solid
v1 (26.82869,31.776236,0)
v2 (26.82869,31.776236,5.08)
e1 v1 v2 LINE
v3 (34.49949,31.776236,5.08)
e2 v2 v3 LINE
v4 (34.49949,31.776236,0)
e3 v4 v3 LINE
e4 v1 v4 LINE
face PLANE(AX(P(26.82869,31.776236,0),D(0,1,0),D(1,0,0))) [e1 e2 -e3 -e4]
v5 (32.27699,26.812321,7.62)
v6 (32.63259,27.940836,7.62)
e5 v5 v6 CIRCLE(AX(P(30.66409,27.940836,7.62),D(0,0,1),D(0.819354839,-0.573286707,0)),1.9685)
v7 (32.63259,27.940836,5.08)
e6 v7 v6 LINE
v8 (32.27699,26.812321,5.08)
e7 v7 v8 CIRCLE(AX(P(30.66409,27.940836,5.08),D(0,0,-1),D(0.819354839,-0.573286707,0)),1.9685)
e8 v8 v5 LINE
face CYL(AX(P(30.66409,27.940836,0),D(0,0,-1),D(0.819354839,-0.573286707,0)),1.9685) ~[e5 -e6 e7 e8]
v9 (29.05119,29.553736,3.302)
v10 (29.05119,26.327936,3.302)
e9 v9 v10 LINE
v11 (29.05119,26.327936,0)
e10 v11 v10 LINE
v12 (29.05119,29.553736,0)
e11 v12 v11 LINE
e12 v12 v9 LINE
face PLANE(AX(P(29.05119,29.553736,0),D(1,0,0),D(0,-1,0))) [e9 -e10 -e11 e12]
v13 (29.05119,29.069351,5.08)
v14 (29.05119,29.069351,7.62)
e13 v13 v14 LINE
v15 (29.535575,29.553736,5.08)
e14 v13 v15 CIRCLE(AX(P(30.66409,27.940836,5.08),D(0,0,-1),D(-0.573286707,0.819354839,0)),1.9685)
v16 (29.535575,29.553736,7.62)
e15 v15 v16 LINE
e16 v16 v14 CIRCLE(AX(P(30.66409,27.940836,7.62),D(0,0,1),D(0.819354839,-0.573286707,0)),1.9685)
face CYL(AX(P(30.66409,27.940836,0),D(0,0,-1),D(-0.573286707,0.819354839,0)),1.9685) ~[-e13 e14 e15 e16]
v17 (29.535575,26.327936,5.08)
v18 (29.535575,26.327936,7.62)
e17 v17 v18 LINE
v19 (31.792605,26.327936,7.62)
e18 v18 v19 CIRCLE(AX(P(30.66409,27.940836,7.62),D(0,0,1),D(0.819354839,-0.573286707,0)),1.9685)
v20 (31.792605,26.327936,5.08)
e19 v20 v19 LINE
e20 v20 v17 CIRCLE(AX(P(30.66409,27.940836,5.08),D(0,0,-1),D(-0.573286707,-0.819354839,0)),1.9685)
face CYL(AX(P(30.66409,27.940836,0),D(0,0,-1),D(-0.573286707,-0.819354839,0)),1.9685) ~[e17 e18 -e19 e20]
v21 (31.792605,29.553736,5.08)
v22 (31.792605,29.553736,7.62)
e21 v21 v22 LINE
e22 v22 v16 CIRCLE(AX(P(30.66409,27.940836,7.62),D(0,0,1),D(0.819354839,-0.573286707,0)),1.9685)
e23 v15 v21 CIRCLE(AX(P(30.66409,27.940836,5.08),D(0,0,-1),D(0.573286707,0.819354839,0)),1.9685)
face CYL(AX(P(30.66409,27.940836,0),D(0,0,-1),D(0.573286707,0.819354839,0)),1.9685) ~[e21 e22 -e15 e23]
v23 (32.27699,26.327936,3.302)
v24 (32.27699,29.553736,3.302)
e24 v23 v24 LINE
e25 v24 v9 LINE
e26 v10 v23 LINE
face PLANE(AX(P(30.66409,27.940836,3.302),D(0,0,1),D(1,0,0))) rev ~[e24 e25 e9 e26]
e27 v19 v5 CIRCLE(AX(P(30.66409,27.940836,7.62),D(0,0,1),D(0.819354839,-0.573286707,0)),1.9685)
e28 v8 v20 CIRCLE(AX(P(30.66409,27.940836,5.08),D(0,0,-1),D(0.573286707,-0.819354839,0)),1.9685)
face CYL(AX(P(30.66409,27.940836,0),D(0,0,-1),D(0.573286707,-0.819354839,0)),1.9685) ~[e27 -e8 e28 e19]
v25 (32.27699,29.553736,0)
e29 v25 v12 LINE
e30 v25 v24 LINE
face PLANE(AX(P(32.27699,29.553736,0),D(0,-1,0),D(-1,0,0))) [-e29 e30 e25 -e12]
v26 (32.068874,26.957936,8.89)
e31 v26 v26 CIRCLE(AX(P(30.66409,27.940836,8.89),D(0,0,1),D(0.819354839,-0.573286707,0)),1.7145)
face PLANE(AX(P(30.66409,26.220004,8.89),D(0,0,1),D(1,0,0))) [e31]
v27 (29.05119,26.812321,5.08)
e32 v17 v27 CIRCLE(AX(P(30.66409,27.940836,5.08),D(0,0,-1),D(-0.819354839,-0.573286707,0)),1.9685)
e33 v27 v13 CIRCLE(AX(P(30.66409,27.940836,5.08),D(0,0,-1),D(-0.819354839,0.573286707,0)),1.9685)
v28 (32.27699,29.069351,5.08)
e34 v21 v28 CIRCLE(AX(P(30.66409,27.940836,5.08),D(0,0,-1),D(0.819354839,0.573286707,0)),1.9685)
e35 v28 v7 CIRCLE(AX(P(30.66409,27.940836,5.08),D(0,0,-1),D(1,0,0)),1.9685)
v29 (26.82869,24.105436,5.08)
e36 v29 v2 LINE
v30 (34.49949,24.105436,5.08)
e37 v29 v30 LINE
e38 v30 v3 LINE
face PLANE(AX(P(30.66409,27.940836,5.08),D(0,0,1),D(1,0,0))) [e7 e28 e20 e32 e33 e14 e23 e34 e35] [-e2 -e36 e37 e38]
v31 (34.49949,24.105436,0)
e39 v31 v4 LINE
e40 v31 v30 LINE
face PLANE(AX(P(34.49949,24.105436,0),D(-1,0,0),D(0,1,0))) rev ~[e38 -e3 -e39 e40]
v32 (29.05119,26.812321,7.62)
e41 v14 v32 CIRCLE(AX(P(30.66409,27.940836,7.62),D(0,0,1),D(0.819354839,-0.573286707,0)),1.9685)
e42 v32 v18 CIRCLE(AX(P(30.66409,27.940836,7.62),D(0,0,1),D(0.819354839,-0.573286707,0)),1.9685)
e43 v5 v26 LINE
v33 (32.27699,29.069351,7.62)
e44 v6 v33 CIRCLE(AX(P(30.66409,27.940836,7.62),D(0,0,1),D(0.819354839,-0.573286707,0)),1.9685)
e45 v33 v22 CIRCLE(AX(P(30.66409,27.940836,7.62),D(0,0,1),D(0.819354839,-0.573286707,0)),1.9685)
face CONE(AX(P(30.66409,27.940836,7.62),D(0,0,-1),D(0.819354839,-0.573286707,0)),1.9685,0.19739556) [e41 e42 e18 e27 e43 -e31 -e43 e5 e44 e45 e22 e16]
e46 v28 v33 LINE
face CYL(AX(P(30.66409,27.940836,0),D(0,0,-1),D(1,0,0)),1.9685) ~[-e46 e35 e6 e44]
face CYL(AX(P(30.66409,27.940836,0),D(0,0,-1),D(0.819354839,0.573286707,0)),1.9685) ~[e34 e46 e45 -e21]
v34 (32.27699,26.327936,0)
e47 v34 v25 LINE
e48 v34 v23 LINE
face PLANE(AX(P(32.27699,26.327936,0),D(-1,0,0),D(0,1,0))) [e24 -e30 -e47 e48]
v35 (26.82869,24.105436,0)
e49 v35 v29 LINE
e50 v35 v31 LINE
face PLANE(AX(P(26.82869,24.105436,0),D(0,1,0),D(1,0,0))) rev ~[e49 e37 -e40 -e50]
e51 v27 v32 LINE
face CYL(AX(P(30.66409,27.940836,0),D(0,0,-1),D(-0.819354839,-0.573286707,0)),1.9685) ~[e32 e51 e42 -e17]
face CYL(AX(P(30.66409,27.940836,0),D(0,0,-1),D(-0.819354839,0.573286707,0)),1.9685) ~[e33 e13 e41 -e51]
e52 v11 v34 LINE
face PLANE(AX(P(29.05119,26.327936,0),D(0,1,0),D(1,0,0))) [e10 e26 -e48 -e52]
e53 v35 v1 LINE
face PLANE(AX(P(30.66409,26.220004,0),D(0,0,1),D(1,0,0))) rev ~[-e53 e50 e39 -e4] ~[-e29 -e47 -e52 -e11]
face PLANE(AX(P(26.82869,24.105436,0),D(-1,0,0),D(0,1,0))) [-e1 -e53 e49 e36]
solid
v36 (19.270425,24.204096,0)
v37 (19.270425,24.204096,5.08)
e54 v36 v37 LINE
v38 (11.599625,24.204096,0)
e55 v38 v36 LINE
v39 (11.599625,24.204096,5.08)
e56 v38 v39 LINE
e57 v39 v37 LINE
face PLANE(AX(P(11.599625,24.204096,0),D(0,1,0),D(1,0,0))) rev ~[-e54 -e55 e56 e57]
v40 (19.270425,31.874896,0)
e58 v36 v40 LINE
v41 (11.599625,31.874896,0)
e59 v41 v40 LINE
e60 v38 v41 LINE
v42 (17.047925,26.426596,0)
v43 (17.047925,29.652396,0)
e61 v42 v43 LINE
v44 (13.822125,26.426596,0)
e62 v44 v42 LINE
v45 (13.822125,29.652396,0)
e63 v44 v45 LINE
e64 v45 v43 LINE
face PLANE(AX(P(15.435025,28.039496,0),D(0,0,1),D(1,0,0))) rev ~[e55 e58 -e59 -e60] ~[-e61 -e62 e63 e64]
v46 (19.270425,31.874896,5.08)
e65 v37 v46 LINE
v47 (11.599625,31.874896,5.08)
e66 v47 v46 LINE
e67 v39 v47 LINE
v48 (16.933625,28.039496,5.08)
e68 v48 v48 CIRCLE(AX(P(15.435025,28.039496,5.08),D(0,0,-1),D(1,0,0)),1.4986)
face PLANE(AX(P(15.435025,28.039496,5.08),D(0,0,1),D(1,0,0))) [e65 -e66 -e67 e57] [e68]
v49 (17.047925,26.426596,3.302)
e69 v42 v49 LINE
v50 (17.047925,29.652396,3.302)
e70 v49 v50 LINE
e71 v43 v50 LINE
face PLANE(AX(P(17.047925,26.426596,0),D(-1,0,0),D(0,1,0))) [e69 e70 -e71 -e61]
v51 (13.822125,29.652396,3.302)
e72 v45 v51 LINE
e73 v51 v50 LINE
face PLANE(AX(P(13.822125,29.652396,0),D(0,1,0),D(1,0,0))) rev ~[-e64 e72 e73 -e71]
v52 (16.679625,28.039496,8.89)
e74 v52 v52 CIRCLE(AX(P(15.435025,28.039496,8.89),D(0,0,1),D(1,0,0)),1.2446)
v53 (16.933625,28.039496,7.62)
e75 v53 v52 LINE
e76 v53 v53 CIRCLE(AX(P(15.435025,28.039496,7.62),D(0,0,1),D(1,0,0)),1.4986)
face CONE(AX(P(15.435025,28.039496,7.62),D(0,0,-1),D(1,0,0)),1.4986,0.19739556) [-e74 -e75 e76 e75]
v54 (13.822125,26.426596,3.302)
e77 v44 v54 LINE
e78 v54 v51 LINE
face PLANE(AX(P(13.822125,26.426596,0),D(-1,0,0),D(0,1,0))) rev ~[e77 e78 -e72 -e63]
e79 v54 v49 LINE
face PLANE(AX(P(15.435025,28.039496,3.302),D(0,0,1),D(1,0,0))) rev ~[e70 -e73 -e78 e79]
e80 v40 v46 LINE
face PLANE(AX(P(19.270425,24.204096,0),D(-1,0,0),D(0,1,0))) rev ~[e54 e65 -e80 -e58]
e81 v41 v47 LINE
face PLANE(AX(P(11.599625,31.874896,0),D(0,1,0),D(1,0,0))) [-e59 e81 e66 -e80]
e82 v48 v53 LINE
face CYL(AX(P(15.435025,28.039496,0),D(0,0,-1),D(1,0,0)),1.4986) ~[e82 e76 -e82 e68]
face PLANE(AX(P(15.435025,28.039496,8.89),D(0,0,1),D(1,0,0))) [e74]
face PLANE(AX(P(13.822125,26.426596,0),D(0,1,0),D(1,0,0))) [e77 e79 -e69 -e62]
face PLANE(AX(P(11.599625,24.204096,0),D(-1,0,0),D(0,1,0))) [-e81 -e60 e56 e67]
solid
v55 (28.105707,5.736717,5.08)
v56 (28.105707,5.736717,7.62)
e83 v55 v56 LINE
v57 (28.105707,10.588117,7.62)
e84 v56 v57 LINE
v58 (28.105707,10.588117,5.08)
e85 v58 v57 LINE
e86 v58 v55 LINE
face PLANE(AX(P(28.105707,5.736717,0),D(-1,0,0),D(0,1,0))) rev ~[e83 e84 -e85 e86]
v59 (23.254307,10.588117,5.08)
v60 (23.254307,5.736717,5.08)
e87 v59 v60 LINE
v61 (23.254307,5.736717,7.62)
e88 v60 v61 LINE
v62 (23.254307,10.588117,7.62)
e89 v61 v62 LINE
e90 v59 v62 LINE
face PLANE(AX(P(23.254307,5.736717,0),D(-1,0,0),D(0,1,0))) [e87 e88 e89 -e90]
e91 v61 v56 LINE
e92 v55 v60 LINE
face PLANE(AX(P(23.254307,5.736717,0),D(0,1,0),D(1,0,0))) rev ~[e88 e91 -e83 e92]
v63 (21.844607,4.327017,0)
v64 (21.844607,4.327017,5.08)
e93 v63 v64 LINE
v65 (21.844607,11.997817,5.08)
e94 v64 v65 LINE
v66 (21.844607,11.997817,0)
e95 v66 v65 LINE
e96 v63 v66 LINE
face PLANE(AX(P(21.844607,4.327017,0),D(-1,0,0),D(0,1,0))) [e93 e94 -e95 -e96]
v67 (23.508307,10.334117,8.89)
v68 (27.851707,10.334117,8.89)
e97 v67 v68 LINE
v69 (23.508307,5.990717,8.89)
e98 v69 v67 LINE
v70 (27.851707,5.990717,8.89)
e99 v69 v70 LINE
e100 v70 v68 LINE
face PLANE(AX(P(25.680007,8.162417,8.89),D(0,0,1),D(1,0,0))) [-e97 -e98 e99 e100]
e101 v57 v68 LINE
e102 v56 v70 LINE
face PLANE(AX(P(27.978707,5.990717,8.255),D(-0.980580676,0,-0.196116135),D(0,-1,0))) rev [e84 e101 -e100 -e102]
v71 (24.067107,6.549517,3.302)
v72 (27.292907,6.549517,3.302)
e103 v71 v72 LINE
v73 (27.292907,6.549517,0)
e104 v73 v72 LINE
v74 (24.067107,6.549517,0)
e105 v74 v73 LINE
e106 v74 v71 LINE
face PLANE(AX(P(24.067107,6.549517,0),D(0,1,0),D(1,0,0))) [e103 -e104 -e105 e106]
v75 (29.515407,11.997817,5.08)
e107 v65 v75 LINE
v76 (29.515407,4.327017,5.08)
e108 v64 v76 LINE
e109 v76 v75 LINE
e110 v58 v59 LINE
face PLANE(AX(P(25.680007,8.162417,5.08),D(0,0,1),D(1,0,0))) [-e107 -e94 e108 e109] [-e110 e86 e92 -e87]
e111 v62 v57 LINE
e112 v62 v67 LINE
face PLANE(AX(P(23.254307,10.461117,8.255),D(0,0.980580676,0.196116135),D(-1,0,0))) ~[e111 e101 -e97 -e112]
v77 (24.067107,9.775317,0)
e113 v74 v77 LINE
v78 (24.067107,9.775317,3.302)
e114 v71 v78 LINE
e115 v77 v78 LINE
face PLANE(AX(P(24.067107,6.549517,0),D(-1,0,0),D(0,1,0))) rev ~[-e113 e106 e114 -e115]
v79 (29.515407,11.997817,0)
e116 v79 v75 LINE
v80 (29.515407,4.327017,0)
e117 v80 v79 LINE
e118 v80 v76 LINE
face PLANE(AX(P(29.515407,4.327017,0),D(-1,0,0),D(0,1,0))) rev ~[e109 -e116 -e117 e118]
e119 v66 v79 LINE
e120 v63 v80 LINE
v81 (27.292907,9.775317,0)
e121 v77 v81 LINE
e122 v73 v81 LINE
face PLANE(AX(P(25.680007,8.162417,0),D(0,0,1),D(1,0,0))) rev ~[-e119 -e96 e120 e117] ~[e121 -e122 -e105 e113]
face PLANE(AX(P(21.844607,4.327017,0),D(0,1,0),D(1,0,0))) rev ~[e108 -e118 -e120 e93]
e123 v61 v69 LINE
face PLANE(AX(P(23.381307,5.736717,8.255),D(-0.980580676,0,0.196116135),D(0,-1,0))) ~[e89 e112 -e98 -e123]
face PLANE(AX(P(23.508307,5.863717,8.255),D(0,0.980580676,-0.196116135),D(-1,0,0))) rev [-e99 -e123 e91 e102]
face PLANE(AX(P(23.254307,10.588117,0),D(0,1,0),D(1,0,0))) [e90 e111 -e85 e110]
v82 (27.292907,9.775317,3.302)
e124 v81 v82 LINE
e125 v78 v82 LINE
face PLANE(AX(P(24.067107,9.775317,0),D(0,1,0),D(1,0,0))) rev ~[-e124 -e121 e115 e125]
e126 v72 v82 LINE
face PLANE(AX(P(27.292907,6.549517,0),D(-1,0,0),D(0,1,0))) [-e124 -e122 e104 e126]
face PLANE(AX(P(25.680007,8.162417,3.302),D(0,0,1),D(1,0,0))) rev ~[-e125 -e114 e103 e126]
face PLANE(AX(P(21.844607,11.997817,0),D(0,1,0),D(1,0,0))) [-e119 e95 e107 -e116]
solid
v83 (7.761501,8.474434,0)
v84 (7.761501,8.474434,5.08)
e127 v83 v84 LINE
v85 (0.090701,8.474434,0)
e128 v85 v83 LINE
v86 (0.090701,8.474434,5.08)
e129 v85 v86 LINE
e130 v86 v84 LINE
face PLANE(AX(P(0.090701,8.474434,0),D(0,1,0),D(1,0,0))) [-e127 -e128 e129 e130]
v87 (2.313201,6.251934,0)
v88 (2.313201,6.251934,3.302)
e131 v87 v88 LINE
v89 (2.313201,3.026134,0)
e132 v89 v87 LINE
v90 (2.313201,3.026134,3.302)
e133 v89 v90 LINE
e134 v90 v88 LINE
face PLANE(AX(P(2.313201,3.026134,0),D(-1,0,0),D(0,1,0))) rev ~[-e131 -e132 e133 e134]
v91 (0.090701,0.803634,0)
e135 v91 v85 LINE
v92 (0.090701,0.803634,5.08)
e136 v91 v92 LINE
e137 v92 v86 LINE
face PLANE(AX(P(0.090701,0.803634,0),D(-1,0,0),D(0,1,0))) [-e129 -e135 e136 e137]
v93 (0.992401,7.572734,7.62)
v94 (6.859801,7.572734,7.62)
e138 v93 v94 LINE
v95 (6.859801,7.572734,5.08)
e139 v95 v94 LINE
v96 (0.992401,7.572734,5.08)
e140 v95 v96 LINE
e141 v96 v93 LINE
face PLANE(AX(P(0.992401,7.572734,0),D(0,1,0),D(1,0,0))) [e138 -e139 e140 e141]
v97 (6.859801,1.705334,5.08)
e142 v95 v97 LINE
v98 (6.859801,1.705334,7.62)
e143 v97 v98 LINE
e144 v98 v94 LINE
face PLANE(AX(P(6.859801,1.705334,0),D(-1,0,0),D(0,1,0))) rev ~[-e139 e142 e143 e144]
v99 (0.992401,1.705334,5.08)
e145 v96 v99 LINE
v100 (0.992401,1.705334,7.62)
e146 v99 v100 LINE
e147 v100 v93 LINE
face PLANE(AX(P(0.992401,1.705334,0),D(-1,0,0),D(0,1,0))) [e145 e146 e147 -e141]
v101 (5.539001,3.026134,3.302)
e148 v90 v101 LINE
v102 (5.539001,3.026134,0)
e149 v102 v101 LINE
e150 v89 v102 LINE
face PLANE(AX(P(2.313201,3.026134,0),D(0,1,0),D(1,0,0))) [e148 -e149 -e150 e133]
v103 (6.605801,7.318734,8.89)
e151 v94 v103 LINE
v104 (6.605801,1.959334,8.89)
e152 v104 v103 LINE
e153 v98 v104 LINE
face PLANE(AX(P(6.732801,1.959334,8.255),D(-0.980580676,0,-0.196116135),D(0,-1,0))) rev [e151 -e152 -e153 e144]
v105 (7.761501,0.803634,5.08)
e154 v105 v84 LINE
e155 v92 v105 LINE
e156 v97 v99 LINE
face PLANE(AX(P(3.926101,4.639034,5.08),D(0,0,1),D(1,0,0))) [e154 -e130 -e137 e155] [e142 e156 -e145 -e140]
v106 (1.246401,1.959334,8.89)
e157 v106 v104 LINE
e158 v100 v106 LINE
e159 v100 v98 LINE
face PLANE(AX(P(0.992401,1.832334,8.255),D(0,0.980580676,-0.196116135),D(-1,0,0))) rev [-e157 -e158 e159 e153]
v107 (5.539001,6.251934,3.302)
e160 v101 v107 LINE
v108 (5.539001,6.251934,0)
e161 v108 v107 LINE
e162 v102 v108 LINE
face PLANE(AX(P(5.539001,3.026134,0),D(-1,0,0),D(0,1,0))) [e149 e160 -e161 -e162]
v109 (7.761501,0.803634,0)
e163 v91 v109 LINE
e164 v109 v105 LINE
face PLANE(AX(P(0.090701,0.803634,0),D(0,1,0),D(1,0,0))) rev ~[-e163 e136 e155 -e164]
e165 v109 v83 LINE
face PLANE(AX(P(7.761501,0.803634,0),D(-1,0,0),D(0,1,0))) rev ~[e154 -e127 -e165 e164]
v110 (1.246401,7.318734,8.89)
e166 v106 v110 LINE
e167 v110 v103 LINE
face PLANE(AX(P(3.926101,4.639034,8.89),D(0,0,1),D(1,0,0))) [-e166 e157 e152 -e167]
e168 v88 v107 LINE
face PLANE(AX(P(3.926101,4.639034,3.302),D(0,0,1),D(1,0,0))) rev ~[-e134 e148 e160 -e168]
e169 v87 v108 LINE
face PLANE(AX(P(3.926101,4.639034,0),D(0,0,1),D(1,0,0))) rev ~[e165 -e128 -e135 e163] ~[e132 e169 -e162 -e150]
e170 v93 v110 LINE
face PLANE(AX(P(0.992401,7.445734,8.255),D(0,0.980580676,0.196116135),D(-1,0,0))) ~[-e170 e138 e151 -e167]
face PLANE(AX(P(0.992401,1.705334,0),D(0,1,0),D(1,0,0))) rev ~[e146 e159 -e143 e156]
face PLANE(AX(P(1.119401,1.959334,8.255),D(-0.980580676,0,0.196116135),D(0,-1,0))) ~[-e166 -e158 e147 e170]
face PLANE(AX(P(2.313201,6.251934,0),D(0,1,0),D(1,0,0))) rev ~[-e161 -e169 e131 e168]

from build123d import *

# Parameters (mm, degrees)
F0_W          = 7.6708
F0_H          = 7.6708
F0_W_2        = 5.8674
F0_H_2        = 5.8674
F0_W_3        = 3.2258
F0_H_3        = 3.2258
F1_DEPTH      = 5.08
F0_R          = 1.4986
F0_W_4        = 4.8514
F0_H_4        = 4.8514
F2_DEPTH      = 8.89
F3_DEPTH      = 8.89
F4_DEPTH      = 8.89
F5_DEPTH      = 8.89
F6_C1_SIZE2   = 0.254
F6_C1_SIZE    = 1.27
F6_C2_SIZE2   = 0.254
F6_C2_SIZE    = 1.27
F6_C3_SIZE2   = 0.254
F6_C3_SIZE    = 1.27
F6_C4_SIZE2   = 0.254
F6_C4_SIZE    = 1.27
F6_4_C1_SIZE2 = 0.254
F6_4_C1_SIZE  = 1.27
F6_4_C2_SIZE2 = 0.254
F6_4_C2_SIZE  = 1.27
F6_4_C3_SIZE2 = 0.254
F6_4_C3_SIZE  = 1.27
F6_4_C4_SIZE2 = 0.254
F6_4_C4_SIZE  = 1.27
F7_DEPTH      = 3.302
F8_DEPTH      = 3.302
F9_DEPTH      = 3.302
F10_DEPTH     = 3.302


# Not quite as in the source:
# - a fillet or chamfer that OpenCascade refuses, or shapes differently, is made with other operations: its cross-section is extruded or revolved along the edge and cut away or added


with BuildPart() as f1:
    # F0 (on Top) → F1 (new body)
    with BuildSketch(Plane.XY):
        with Locations((3.9261005717, 4.6390335905)):
            Rectangle(F0_W, F0_H)
        with Locations((3.9261005717, 4.6390335905)):
            Rectangle(F0_W_2, F0_H_2, mode=Mode.SUBTRACT)
        with Locations((3.9261005717, 4.6390335905)):
            Rectangle(F0_W_2, F0_H_2)
        with Locations((3.9261005717, 4.6390335905)):
            Rectangle(F0_W_3, F0_H_3, mode=Mode.SUBTRACT)
        with Locations((3.9261005717, 4.6390335905)):
            Rectangle(F0_W_3, F0_H_3)
    extrude(amount=F1_DEPTH)

    # F0 (on Top) → F5 (join)
    with BuildSketch(Plane.XY):
        with Locations((3.9261005717, 4.6390335905)):
            Rectangle(F0_W_2, F0_H_2)
        with Locations((3.9261005717, 4.6390335905)):
            Rectangle(F0_W_3, F0_H_3, mode=Mode.SUBTRACT)
        with Locations((3.9261005717, 4.6390335905)):
            Rectangle(F0_W_3, F0_H_3)
    extrude(amount=F5_DEPTH)

    # F6: chamfer of 0.254 x 1.27 on 4 edges, made by hand

    # F6_c1
    f6_c1_edges = [f1.edges().sort_by_distance(p)[0] for p in [
        (3.9261005717, 1.7053335905, 8.89),
    ]]
    f6_c1_side = f1.faces().sort_by_distance((3.9261005717, 1.7053335905, 8.88492))[0]
    chamfer(f6_c1_edges, length=F6_C1_SIZE, length2=F6_C1_SIZE2, reference=f6_c1_side)

    # F6_c2
    f6_c2_edges = [f1.edges().sort_by_distance(p)[0] for p in [
        (6.8598005717, 4.7660335905, 8.89),
    ]]
    f6_c2_side = f1.faces().sort_by_distance((6.8598005717, 4.7660335905, 8.88492))[0]
    chamfer(f6_c2_edges, length=F6_C2_SIZE, length2=F6_C2_SIZE2, reference=f6_c2_side)

    # F6_c3
    f6_c3_edges = [f1.edges().sort_by_distance(p)[0] for p in [
        (3.7991005717, 7.5727335905, 8.89),
    ]]
    f6_c3_side = f1.faces().sort_by_distance((3.7991005717, 7.5727335905, 8.88492))[0]
    chamfer(f6_c3_edges, length=F6_C3_SIZE, length2=F6_C3_SIZE2, reference=f6_c3_side)

    # F6_c4
    f6_c4_edges = [f1.edges().sort_by_distance(p)[0] for p in [
        (0.9924005717, 4.6390335905, 8.89),
    ]]
    f6_c4_side = f1.faces().sort_by_distance((0.9924005717, 4.6390335905, 8.88492))[0]
    chamfer(f6_c4_edges, length=F6_C4_SIZE, length2=F6_C4_SIZE2, reference=f6_c4_side)

    # F0 (on Top) → F10 (cut)
    with BuildSketch(Plane.XY):
        with Locations((3.9261005717, 4.6390335905)):
            Rectangle(F0_W_3, F0_H_3)
    extrude(amount=F10_DEPTH, mode=Mode.SUBTRACT)


with BuildPart() as f1b:
    # F0 (on Top) → F1, piece 2 (new body)
    with BuildSketch(Plane.XY):
        with Locations((30.6640900671, 27.9408358037)):
            Rectangle(F0_W, F0_H)
        with BuildLine():
            Line((29.0511900671, 29.0693506862), (29.0511900671, 29.5537358037))
            Line((29.0511900671, 29.5537358037), (29.5355751847, 29.5537358037))
            ThreePointArc((29.5355751847, 29.5537358037), (30.6640900671, 29.9093358037), (31.7926049496, 29.5537358037))
            Line((31.7926049496, 29.5537358037), (32.2769900671, 29.5537358037))
            Line((32.2769900671, 29.5537358037), (32.2769900671, 29.0693506862))
            ThreePointArc((32.2769900671, 29.0693506862), (32.5415865252, 28.5324431904), (32.6325900671, 27.9408358037))
            ThreePointArc((32.6325900671, 27.9408358037), (32.5415865252, 27.349228417), (32.2769900671, 26.8123209213))
            Line((32.2769900671, 26.8123209213), (32.2769900671, 26.3279358037))
            Line((32.2769900671, 26.3279358037), (31.7926049496, 26.3279358037))
            ThreePointArc((31.7926049496, 26.3279358037), (30.6640900671, 25.9723358037), (29.5355751847, 26.3279358037))
            Line((29.5355751847, 26.3279358037), (29.0511900671, 26.3279358037))
            Line((29.0511900671, 26.3279358037), (29.0511900671, 26.8123209213))
            ThreePointArc((29.0511900671, 26.8123209213), (28.6955900671, 27.9408358037), (29.0511900671, 29.0693506862))
        make_face(mode=Mode.SUBTRACT)
        with BuildLine():
            Line((31.7926049496, 29.5537358037), (29.5355751847, 29.5537358037))
            ThreePointArc((29.5355751847, 29.5537358037), (29.2721503684, 29.3327755025), (29.0511900671, 29.0693506862))
            Line((29.0511900671, 29.0693506862), (29.0511900671, 26.8123209213))
            ThreePointArc((29.0511900671, 26.8123209213), (29.2721503684, 26.548896105), (29.5355751847, 26.3279358037))
            Line((29.5355751847, 26.3279358037), (31.7926049496, 26.3279358037))
            ThreePointArc((31.7926049496, 26.3279358037), (32.0560297659, 26.548896105), (32.2769900671, 26.8123209213))
            Line((32.2769900671, 26.8123209213), (32.2769900671, 29.0693506862))
            ThreePointArc((32.2769900671, 29.0693506862), (32.0560297659, 29.3327755025), (31.7926049496, 29.5537358037))
        make_face()
        with BuildLine():
            Line((29.0511900671, 26.8123209213), (29.0511900671, 29.0693506862))
            ThreePointArc((29.0511900671, 29.0693506862), (28.6955900671, 27.9408358037), (29.0511900671, 26.8123209213))
        make_face()
        with BuildLine():
            ThreePointArc((32.6325900671, 27.9408358037), (32.5415865252, 28.5324431904), (32.2769900671, 29.0693506862))
            Line((32.2769900671, 29.0693506862), (32.2769900671, 26.8123209213))
            ThreePointArc((32.2769900671, 26.8123209213), (32.5415865252, 27.349228417), (32.6325900671, 27.9408358037))
        make_face()
        with BuildLine():
            Line((31.7926049496, 26.3279358037), (29.5355751847, 26.3279358037))
            ThreePointArc((29.5355751847, 26.3279358037), (30.6640900671, 25.9723358037), (31.7926049496, 26.3279358037))
        make_face()
        with BuildLine():
            ThreePointArc((31.7926049496, 29.5537358037), (30.6640900671, 29.9093358037), (29.5355751847, 29.5537358037))
            Line((29.5355751847, 29.5537358037), (31.7926049496, 29.5537358037))
        make_face()
        with BuildLine():
            ThreePointArc((29.5355751847, 26.3279358037), (29.2721503684, 26.548896105), (29.0511900671, 26.8123209213))
            Line((29.0511900671, 26.8123209213), (29.0511900671, 26.3279358037))
            Line((29.0511900671, 26.3279358037), (29.5355751847, 26.3279358037))
        make_face()
        with BuildLine():
            Line((29.5355751847, 29.5537358037), (29.0511900671, 29.5537358037))
            Line((29.0511900671, 29.5537358037), (29.0511900671, 29.0693506862))
            ThreePointArc((29.0511900671, 29.0693506862), (29.2721503684, 29.3327755025), (29.5355751847, 29.5537358037))
        make_face()
        with BuildLine():
            Line((32.2769900671, 29.5537358037), (31.7926049496, 29.5537358037))
            ThreePointArc((31.7926049496, 29.5537358037), (32.0560297659, 29.3327755025), (32.2769900671, 29.0693506862))
            Line((32.2769900671, 29.0693506862), (32.2769900671, 29.5537358037))
        make_face()
        with BuildLine():
            Line((32.2769900671, 26.3279358037), (32.2769900671, 26.8123209213))
            ThreePointArc((32.2769900671, 26.8123209213), (32.0560297659, 26.548896105), (31.7926049496, 26.3279358037))
            Line((31.7926049496, 26.3279358037), (32.2769900671, 26.3279358037))
        make_face()
    extrude(amount=F1_DEPTH)

    # F0 (on Top) → F2 (join)
    with BuildSketch(Plane.XY):
        with BuildLine():
            Line((31.7926049496, 26.3279358037), (29.5355751847, 26.3279358037))
            ThreePointArc((29.5355751847, 26.3279358037), (30.6640900671, 25.9723358037), (31.7926049496, 26.3279358037))
        make_face()
        with BuildLine():
            Line((31.7926049496, 29.5537358037), (29.5355751847, 29.5537358037))
            ThreePointArc((29.5355751847, 29.5537358037), (29.2721503684, 29.3327755025), (29.0511900671, 29.0693506862))
            Line((29.0511900671, 29.0693506862), (29.0511900671, 26.8123209213))
            ThreePointArc((29.0511900671, 26.8123209213), (29.2721503684, 26.548896105), (29.5355751847, 26.3279358037))
            Line((29.5355751847, 26.3279358037), (31.7926049496, 26.3279358037))
            ThreePointArc((31.7926049496, 26.3279358037), (32.0560297659, 26.548896105), (32.2769900671, 26.8123209213))
            Line((32.2769900671, 26.8123209213), (32.2769900671, 29.0693506862))
            ThreePointArc((32.2769900671, 29.0693506862), (32.0560297659, 29.3327755025), (31.7926049496, 29.5537358037))
        make_face()
        with BuildLine():
            Line((29.0511900671, 26.8123209213), (29.0511900671, 29.0693506862))
            ThreePointArc((29.0511900671, 29.0693506862), (28.6955900671, 27.9408358037), (29.0511900671, 26.8123209213))
        make_face()
        with BuildLine():
            ThreePointArc((31.7926049496, 29.5537358037), (30.6640900671, 29.9093358037), (29.5355751847, 29.5537358037))
            Line((29.5355751847, 29.5537358037), (31.7926049496, 29.5537358037))
        make_face()
        with BuildLine():
            ThreePointArc((32.6325900671, 27.9408358037), (32.5415865252, 28.5324431904), (32.2769900671, 29.0693506862))
            Line((32.2769900671, 29.0693506862), (32.2769900671, 26.8123209213))
            ThreePointArc((32.2769900671, 26.8123209213), (32.5415865252, 27.349228417), (32.6325900671, 27.9408358037))
        make_face()
    extrude(amount=F2_DEPTH)

    # F6#2: chamfer of 0.254 x 1.27 on 1 edges, made by hand

    # F6_2_s1 → F6_2_t2 (revolve, cut)
    with BuildSketch(Plane(origin=(23.202503455, 33.1615633992, 0), x_dir=(0, 0, 1), z_dir=(-0.5732867069, -0.8193548387, 0))):
        Polygon((7.62, -11.0751608258), (8.89, -10.8211608258), (8.89, -11.0751608258), align=None)
    revolve(axis=Axis((30.6640900671, 27.9408358037, 8.89), (0, 0, 1)), mode=Mode.SUBTRACT)

    # F0 (on Top) → F7 (cut)
    with BuildSketch(Plane.XY):
        with BuildLine():
            Line((31.7926049496, 29.5537358037), (29.5355751847, 29.5537358037))
            ThreePointArc((29.5355751847, 29.5537358037), (29.2721503684, 29.3327755025), (29.0511900671, 29.0693506862))
            Line((29.0511900671, 29.0693506862), (29.0511900671, 26.8123209213))
            ThreePointArc((29.0511900671, 26.8123209213), (29.2721503684, 26.548896105), (29.5355751847, 26.3279358037))
            Line((29.5355751847, 26.3279358037), (31.7926049496, 26.3279358037))
            ThreePointArc((31.7926049496, 26.3279358037), (32.0560297659, 26.548896105), (32.2769900671, 26.8123209213))
            Line((32.2769900671, 26.8123209213), (32.2769900671, 29.0693506862))
            ThreePointArc((32.2769900671, 29.0693506862), (32.0560297659, 29.3327755025), (31.7926049496, 29.5537358037))
        make_face()
        with BuildLine():
            ThreePointArc((29.5355751847, 26.3279358037), (29.2721503684, 26.548896105), (29.0511900671, 26.8123209213))
            Line((29.0511900671, 26.8123209213), (29.0511900671, 26.3279358037))
            Line((29.0511900671, 26.3279358037), (29.5355751847, 26.3279358037))
        make_face()
        with BuildLine():
            Line((32.2769900671, 26.3279358037), (32.2769900671, 26.8123209213))
            ThreePointArc((32.2769900671, 26.8123209213), (32.0560297659, 26.548896105), (31.7926049496, 26.3279358037))
            Line((31.7926049496, 26.3279358037), (32.2769900671, 26.3279358037))
        make_face()
        with BuildLine():
            Line((32.2769900671, 29.5537358037), (31.7926049496, 29.5537358037))
            ThreePointArc((31.7926049496, 29.5537358037), (32.0560297659, 29.3327755025), (32.2769900671, 29.0693506862))
            Line((32.2769900671, 29.0693506862), (32.2769900671, 29.5537358037))
        make_face()
        with BuildLine():
            Line((29.5355751847, 29.5537358037), (29.0511900671, 29.5537358037))
            Line((29.0511900671, 29.5537358037), (29.0511900671, 29.0693506862))
            ThreePointArc((29.0511900671, 29.0693506862), (29.2721503684, 29.3327755025), (29.5355751847, 29.5537358037))
        make_face()
    extrude(amount=F7_DEPTH, mode=Mode.SUBTRACT)


with BuildPart() as f1c:
    # F0 (on Top) → F1, piece 3 (new body)
    with BuildSketch(Plane.XY):
        with Locations((15.4350250959, 28.039496392)):
            Rectangle(F0_W, F0_H)
        with Locations((15.4350250959, 28.039496392)):
            Rectangle(F0_W_3, F0_H_3, mode=Mode.SUBTRACT)
        with Locations((15.4350250959, 28.039496392)):
            Rectangle(F0_W_3, F0_H_3)
        with Locations((15.4350250959, 28.039496392)):
            Circle(F0_R, mode=Mode.SUBTRACT)
        with Locations((15.4350250959, 28.039496392)):
            Circle(F0_R)
    extrude(amount=F1_DEPTH)

    # F0 (on Top) → F3 (join)
    with BuildSketch(Plane.XY):
        with Locations((15.4350250959, 28.039496392)):
            Circle(F0_R)
    extrude(amount=F3_DEPTH)

    # F6#3: chamfer of 0.254 x 1.27 on 1 edges, made by hand

    # F6_3_s1 → F6_3_t2 (revolve, cut)
    with BuildSketch(Plane.XZ.offset(-28.039496392)):
        Polygon((16.9336250959, 7.62), (16.6796250959, 8.89), (16.9336250959, 8.89), align=None)
    revolve(axis=Axis((15.4350250959, 28.039496392, 8.89), (0, 0, 1)), mode=Mode.SUBTRACT)

    # F0 (on Top) → F8 (cut)
    with BuildSketch(Plane.XY):
        with Locations((15.4350250959, 28.039496392)):
            Rectangle(F0_W_3, F0_H_3)
        with Locations((15.4350250959, 28.039496392)):
            Circle(F0_R, mode=Mode.SUBTRACT)
        with Locations((15.4350250959, 28.039496392)):
            Circle(F0_R)
    extrude(amount=F8_DEPTH, mode=Mode.SUBTRACT)


with BuildPart() as f1d:
    # F0 (on Top) → F1, piece 4 (new body)
    with BuildSketch(Plane.XY):
        with Locations((25.6800069869, 8.162417023)):
            Rectangle(F0_W, F0_H)
        with Locations((25.6800069869, 8.162417023)):
            Rectangle(F0_W_4, F0_H_4, mode=Mode.SUBTRACT)
        with Locations((25.6800069869, 8.162417023)):
            Rectangle(F0_W_4, F0_H_4)
        with Locations((25.6800069869, 8.162417023)):
            Rectangle(F0_W_3, F0_H_3, mode=Mode.SUBTRACT)
        with Locations((25.6800069869, 8.162417023)):
            Rectangle(F0_W_3, F0_H_3)
    extrude(amount=F1_DEPTH)

    # F0 (on Top) → F4 (join)
    with BuildSketch(Plane.XY):
        with Locations((25.6800069869, 8.162417023)):
            Rectangle(F0_W_4, F0_H_4)
        with Locations((25.6800069869, 8.162417023)):
            Rectangle(F0_W_3, F0_H_3, mode=Mode.SUBTRACT)
        with Locations((25.6800069869, 8.162417023)):
            Rectangle(F0_W_3, F0_H_3)
    extrude(amount=F4_DEPTH)

    # F6#4: chamfer of 0.254 x 1.27 on 4 edges, made by hand

    # F6_4_c1
    f6_4_c1_edges = [f1d.edges().sort_by_distance(p)[0] for p in [
        (25.6800069869, 10.588117023, 8.89),
    ]]
    f6_4_c1_side = f1d.faces().sort_by_distance((25.6800069869, 10.588117023, 8.88492))[0]
    chamfer(f6_4_c1_edges, length=F6_4_C1_SIZE, length2=F6_4_C1_SIZE2, reference=f6_4_c1_side)

    # F6_4_c2
    f6_4_c2_edges = [f1d.edges().sort_by_distance(p)[0] for p in [
        (23.2543069869, 8.035417023, 8.89),
    ]]
    f6_4_c2_side = f1d.faces().sort_by_distance((23.2543069869, 8.035417023, 8.88492))[0]
    chamfer(f6_4_c2_edges, length=F6_4_C2_SIZE, length2=F6_4_C2_SIZE2, reference=f6_4_c2_side)

    # F6_4_c3
    f6_4_c3_edges = [f1d.edges().sort_by_distance(p)[0] for p in [
        (25.8070069869, 5.736717023, 8.89),
    ]]
    f6_4_c3_side = f1d.faces().sort_by_distance((25.8070069869, 5.736717023, 8.88492))[0]
    chamfer(f6_4_c3_edges, length=F6_4_C3_SIZE, length2=F6_4_C3_SIZE2, reference=f6_4_c3_side)

    # F6_4_c4
    f6_4_c4_edges = [f1d.edges().sort_by_distance(p)[0] for p in [
        (28.1057069869, 8.162417023, 8.89),
    ]]
    f6_4_c4_side = f1d.faces().sort_by_distance((28.1057069869, 8.162417023, 8.88492))[0]
    chamfer(f6_4_c4_edges, length=F6_4_C4_SIZE, length2=F6_4_C4_SIZE2, reference=f6_4_c4_side)

    # F0 (on Top) → F9 (cut)
    with BuildSketch(Plane.XY):
        with Locations((25.6800069869, 8.162417023)):
            Rectangle(F0_W_3, F0_H_3)
    extrude(amount=F9_DEPTH, mode=Mode.SUBTRACT)


solid = Compound([f1.part, f1b.part, f1c.part, f1d.part])
